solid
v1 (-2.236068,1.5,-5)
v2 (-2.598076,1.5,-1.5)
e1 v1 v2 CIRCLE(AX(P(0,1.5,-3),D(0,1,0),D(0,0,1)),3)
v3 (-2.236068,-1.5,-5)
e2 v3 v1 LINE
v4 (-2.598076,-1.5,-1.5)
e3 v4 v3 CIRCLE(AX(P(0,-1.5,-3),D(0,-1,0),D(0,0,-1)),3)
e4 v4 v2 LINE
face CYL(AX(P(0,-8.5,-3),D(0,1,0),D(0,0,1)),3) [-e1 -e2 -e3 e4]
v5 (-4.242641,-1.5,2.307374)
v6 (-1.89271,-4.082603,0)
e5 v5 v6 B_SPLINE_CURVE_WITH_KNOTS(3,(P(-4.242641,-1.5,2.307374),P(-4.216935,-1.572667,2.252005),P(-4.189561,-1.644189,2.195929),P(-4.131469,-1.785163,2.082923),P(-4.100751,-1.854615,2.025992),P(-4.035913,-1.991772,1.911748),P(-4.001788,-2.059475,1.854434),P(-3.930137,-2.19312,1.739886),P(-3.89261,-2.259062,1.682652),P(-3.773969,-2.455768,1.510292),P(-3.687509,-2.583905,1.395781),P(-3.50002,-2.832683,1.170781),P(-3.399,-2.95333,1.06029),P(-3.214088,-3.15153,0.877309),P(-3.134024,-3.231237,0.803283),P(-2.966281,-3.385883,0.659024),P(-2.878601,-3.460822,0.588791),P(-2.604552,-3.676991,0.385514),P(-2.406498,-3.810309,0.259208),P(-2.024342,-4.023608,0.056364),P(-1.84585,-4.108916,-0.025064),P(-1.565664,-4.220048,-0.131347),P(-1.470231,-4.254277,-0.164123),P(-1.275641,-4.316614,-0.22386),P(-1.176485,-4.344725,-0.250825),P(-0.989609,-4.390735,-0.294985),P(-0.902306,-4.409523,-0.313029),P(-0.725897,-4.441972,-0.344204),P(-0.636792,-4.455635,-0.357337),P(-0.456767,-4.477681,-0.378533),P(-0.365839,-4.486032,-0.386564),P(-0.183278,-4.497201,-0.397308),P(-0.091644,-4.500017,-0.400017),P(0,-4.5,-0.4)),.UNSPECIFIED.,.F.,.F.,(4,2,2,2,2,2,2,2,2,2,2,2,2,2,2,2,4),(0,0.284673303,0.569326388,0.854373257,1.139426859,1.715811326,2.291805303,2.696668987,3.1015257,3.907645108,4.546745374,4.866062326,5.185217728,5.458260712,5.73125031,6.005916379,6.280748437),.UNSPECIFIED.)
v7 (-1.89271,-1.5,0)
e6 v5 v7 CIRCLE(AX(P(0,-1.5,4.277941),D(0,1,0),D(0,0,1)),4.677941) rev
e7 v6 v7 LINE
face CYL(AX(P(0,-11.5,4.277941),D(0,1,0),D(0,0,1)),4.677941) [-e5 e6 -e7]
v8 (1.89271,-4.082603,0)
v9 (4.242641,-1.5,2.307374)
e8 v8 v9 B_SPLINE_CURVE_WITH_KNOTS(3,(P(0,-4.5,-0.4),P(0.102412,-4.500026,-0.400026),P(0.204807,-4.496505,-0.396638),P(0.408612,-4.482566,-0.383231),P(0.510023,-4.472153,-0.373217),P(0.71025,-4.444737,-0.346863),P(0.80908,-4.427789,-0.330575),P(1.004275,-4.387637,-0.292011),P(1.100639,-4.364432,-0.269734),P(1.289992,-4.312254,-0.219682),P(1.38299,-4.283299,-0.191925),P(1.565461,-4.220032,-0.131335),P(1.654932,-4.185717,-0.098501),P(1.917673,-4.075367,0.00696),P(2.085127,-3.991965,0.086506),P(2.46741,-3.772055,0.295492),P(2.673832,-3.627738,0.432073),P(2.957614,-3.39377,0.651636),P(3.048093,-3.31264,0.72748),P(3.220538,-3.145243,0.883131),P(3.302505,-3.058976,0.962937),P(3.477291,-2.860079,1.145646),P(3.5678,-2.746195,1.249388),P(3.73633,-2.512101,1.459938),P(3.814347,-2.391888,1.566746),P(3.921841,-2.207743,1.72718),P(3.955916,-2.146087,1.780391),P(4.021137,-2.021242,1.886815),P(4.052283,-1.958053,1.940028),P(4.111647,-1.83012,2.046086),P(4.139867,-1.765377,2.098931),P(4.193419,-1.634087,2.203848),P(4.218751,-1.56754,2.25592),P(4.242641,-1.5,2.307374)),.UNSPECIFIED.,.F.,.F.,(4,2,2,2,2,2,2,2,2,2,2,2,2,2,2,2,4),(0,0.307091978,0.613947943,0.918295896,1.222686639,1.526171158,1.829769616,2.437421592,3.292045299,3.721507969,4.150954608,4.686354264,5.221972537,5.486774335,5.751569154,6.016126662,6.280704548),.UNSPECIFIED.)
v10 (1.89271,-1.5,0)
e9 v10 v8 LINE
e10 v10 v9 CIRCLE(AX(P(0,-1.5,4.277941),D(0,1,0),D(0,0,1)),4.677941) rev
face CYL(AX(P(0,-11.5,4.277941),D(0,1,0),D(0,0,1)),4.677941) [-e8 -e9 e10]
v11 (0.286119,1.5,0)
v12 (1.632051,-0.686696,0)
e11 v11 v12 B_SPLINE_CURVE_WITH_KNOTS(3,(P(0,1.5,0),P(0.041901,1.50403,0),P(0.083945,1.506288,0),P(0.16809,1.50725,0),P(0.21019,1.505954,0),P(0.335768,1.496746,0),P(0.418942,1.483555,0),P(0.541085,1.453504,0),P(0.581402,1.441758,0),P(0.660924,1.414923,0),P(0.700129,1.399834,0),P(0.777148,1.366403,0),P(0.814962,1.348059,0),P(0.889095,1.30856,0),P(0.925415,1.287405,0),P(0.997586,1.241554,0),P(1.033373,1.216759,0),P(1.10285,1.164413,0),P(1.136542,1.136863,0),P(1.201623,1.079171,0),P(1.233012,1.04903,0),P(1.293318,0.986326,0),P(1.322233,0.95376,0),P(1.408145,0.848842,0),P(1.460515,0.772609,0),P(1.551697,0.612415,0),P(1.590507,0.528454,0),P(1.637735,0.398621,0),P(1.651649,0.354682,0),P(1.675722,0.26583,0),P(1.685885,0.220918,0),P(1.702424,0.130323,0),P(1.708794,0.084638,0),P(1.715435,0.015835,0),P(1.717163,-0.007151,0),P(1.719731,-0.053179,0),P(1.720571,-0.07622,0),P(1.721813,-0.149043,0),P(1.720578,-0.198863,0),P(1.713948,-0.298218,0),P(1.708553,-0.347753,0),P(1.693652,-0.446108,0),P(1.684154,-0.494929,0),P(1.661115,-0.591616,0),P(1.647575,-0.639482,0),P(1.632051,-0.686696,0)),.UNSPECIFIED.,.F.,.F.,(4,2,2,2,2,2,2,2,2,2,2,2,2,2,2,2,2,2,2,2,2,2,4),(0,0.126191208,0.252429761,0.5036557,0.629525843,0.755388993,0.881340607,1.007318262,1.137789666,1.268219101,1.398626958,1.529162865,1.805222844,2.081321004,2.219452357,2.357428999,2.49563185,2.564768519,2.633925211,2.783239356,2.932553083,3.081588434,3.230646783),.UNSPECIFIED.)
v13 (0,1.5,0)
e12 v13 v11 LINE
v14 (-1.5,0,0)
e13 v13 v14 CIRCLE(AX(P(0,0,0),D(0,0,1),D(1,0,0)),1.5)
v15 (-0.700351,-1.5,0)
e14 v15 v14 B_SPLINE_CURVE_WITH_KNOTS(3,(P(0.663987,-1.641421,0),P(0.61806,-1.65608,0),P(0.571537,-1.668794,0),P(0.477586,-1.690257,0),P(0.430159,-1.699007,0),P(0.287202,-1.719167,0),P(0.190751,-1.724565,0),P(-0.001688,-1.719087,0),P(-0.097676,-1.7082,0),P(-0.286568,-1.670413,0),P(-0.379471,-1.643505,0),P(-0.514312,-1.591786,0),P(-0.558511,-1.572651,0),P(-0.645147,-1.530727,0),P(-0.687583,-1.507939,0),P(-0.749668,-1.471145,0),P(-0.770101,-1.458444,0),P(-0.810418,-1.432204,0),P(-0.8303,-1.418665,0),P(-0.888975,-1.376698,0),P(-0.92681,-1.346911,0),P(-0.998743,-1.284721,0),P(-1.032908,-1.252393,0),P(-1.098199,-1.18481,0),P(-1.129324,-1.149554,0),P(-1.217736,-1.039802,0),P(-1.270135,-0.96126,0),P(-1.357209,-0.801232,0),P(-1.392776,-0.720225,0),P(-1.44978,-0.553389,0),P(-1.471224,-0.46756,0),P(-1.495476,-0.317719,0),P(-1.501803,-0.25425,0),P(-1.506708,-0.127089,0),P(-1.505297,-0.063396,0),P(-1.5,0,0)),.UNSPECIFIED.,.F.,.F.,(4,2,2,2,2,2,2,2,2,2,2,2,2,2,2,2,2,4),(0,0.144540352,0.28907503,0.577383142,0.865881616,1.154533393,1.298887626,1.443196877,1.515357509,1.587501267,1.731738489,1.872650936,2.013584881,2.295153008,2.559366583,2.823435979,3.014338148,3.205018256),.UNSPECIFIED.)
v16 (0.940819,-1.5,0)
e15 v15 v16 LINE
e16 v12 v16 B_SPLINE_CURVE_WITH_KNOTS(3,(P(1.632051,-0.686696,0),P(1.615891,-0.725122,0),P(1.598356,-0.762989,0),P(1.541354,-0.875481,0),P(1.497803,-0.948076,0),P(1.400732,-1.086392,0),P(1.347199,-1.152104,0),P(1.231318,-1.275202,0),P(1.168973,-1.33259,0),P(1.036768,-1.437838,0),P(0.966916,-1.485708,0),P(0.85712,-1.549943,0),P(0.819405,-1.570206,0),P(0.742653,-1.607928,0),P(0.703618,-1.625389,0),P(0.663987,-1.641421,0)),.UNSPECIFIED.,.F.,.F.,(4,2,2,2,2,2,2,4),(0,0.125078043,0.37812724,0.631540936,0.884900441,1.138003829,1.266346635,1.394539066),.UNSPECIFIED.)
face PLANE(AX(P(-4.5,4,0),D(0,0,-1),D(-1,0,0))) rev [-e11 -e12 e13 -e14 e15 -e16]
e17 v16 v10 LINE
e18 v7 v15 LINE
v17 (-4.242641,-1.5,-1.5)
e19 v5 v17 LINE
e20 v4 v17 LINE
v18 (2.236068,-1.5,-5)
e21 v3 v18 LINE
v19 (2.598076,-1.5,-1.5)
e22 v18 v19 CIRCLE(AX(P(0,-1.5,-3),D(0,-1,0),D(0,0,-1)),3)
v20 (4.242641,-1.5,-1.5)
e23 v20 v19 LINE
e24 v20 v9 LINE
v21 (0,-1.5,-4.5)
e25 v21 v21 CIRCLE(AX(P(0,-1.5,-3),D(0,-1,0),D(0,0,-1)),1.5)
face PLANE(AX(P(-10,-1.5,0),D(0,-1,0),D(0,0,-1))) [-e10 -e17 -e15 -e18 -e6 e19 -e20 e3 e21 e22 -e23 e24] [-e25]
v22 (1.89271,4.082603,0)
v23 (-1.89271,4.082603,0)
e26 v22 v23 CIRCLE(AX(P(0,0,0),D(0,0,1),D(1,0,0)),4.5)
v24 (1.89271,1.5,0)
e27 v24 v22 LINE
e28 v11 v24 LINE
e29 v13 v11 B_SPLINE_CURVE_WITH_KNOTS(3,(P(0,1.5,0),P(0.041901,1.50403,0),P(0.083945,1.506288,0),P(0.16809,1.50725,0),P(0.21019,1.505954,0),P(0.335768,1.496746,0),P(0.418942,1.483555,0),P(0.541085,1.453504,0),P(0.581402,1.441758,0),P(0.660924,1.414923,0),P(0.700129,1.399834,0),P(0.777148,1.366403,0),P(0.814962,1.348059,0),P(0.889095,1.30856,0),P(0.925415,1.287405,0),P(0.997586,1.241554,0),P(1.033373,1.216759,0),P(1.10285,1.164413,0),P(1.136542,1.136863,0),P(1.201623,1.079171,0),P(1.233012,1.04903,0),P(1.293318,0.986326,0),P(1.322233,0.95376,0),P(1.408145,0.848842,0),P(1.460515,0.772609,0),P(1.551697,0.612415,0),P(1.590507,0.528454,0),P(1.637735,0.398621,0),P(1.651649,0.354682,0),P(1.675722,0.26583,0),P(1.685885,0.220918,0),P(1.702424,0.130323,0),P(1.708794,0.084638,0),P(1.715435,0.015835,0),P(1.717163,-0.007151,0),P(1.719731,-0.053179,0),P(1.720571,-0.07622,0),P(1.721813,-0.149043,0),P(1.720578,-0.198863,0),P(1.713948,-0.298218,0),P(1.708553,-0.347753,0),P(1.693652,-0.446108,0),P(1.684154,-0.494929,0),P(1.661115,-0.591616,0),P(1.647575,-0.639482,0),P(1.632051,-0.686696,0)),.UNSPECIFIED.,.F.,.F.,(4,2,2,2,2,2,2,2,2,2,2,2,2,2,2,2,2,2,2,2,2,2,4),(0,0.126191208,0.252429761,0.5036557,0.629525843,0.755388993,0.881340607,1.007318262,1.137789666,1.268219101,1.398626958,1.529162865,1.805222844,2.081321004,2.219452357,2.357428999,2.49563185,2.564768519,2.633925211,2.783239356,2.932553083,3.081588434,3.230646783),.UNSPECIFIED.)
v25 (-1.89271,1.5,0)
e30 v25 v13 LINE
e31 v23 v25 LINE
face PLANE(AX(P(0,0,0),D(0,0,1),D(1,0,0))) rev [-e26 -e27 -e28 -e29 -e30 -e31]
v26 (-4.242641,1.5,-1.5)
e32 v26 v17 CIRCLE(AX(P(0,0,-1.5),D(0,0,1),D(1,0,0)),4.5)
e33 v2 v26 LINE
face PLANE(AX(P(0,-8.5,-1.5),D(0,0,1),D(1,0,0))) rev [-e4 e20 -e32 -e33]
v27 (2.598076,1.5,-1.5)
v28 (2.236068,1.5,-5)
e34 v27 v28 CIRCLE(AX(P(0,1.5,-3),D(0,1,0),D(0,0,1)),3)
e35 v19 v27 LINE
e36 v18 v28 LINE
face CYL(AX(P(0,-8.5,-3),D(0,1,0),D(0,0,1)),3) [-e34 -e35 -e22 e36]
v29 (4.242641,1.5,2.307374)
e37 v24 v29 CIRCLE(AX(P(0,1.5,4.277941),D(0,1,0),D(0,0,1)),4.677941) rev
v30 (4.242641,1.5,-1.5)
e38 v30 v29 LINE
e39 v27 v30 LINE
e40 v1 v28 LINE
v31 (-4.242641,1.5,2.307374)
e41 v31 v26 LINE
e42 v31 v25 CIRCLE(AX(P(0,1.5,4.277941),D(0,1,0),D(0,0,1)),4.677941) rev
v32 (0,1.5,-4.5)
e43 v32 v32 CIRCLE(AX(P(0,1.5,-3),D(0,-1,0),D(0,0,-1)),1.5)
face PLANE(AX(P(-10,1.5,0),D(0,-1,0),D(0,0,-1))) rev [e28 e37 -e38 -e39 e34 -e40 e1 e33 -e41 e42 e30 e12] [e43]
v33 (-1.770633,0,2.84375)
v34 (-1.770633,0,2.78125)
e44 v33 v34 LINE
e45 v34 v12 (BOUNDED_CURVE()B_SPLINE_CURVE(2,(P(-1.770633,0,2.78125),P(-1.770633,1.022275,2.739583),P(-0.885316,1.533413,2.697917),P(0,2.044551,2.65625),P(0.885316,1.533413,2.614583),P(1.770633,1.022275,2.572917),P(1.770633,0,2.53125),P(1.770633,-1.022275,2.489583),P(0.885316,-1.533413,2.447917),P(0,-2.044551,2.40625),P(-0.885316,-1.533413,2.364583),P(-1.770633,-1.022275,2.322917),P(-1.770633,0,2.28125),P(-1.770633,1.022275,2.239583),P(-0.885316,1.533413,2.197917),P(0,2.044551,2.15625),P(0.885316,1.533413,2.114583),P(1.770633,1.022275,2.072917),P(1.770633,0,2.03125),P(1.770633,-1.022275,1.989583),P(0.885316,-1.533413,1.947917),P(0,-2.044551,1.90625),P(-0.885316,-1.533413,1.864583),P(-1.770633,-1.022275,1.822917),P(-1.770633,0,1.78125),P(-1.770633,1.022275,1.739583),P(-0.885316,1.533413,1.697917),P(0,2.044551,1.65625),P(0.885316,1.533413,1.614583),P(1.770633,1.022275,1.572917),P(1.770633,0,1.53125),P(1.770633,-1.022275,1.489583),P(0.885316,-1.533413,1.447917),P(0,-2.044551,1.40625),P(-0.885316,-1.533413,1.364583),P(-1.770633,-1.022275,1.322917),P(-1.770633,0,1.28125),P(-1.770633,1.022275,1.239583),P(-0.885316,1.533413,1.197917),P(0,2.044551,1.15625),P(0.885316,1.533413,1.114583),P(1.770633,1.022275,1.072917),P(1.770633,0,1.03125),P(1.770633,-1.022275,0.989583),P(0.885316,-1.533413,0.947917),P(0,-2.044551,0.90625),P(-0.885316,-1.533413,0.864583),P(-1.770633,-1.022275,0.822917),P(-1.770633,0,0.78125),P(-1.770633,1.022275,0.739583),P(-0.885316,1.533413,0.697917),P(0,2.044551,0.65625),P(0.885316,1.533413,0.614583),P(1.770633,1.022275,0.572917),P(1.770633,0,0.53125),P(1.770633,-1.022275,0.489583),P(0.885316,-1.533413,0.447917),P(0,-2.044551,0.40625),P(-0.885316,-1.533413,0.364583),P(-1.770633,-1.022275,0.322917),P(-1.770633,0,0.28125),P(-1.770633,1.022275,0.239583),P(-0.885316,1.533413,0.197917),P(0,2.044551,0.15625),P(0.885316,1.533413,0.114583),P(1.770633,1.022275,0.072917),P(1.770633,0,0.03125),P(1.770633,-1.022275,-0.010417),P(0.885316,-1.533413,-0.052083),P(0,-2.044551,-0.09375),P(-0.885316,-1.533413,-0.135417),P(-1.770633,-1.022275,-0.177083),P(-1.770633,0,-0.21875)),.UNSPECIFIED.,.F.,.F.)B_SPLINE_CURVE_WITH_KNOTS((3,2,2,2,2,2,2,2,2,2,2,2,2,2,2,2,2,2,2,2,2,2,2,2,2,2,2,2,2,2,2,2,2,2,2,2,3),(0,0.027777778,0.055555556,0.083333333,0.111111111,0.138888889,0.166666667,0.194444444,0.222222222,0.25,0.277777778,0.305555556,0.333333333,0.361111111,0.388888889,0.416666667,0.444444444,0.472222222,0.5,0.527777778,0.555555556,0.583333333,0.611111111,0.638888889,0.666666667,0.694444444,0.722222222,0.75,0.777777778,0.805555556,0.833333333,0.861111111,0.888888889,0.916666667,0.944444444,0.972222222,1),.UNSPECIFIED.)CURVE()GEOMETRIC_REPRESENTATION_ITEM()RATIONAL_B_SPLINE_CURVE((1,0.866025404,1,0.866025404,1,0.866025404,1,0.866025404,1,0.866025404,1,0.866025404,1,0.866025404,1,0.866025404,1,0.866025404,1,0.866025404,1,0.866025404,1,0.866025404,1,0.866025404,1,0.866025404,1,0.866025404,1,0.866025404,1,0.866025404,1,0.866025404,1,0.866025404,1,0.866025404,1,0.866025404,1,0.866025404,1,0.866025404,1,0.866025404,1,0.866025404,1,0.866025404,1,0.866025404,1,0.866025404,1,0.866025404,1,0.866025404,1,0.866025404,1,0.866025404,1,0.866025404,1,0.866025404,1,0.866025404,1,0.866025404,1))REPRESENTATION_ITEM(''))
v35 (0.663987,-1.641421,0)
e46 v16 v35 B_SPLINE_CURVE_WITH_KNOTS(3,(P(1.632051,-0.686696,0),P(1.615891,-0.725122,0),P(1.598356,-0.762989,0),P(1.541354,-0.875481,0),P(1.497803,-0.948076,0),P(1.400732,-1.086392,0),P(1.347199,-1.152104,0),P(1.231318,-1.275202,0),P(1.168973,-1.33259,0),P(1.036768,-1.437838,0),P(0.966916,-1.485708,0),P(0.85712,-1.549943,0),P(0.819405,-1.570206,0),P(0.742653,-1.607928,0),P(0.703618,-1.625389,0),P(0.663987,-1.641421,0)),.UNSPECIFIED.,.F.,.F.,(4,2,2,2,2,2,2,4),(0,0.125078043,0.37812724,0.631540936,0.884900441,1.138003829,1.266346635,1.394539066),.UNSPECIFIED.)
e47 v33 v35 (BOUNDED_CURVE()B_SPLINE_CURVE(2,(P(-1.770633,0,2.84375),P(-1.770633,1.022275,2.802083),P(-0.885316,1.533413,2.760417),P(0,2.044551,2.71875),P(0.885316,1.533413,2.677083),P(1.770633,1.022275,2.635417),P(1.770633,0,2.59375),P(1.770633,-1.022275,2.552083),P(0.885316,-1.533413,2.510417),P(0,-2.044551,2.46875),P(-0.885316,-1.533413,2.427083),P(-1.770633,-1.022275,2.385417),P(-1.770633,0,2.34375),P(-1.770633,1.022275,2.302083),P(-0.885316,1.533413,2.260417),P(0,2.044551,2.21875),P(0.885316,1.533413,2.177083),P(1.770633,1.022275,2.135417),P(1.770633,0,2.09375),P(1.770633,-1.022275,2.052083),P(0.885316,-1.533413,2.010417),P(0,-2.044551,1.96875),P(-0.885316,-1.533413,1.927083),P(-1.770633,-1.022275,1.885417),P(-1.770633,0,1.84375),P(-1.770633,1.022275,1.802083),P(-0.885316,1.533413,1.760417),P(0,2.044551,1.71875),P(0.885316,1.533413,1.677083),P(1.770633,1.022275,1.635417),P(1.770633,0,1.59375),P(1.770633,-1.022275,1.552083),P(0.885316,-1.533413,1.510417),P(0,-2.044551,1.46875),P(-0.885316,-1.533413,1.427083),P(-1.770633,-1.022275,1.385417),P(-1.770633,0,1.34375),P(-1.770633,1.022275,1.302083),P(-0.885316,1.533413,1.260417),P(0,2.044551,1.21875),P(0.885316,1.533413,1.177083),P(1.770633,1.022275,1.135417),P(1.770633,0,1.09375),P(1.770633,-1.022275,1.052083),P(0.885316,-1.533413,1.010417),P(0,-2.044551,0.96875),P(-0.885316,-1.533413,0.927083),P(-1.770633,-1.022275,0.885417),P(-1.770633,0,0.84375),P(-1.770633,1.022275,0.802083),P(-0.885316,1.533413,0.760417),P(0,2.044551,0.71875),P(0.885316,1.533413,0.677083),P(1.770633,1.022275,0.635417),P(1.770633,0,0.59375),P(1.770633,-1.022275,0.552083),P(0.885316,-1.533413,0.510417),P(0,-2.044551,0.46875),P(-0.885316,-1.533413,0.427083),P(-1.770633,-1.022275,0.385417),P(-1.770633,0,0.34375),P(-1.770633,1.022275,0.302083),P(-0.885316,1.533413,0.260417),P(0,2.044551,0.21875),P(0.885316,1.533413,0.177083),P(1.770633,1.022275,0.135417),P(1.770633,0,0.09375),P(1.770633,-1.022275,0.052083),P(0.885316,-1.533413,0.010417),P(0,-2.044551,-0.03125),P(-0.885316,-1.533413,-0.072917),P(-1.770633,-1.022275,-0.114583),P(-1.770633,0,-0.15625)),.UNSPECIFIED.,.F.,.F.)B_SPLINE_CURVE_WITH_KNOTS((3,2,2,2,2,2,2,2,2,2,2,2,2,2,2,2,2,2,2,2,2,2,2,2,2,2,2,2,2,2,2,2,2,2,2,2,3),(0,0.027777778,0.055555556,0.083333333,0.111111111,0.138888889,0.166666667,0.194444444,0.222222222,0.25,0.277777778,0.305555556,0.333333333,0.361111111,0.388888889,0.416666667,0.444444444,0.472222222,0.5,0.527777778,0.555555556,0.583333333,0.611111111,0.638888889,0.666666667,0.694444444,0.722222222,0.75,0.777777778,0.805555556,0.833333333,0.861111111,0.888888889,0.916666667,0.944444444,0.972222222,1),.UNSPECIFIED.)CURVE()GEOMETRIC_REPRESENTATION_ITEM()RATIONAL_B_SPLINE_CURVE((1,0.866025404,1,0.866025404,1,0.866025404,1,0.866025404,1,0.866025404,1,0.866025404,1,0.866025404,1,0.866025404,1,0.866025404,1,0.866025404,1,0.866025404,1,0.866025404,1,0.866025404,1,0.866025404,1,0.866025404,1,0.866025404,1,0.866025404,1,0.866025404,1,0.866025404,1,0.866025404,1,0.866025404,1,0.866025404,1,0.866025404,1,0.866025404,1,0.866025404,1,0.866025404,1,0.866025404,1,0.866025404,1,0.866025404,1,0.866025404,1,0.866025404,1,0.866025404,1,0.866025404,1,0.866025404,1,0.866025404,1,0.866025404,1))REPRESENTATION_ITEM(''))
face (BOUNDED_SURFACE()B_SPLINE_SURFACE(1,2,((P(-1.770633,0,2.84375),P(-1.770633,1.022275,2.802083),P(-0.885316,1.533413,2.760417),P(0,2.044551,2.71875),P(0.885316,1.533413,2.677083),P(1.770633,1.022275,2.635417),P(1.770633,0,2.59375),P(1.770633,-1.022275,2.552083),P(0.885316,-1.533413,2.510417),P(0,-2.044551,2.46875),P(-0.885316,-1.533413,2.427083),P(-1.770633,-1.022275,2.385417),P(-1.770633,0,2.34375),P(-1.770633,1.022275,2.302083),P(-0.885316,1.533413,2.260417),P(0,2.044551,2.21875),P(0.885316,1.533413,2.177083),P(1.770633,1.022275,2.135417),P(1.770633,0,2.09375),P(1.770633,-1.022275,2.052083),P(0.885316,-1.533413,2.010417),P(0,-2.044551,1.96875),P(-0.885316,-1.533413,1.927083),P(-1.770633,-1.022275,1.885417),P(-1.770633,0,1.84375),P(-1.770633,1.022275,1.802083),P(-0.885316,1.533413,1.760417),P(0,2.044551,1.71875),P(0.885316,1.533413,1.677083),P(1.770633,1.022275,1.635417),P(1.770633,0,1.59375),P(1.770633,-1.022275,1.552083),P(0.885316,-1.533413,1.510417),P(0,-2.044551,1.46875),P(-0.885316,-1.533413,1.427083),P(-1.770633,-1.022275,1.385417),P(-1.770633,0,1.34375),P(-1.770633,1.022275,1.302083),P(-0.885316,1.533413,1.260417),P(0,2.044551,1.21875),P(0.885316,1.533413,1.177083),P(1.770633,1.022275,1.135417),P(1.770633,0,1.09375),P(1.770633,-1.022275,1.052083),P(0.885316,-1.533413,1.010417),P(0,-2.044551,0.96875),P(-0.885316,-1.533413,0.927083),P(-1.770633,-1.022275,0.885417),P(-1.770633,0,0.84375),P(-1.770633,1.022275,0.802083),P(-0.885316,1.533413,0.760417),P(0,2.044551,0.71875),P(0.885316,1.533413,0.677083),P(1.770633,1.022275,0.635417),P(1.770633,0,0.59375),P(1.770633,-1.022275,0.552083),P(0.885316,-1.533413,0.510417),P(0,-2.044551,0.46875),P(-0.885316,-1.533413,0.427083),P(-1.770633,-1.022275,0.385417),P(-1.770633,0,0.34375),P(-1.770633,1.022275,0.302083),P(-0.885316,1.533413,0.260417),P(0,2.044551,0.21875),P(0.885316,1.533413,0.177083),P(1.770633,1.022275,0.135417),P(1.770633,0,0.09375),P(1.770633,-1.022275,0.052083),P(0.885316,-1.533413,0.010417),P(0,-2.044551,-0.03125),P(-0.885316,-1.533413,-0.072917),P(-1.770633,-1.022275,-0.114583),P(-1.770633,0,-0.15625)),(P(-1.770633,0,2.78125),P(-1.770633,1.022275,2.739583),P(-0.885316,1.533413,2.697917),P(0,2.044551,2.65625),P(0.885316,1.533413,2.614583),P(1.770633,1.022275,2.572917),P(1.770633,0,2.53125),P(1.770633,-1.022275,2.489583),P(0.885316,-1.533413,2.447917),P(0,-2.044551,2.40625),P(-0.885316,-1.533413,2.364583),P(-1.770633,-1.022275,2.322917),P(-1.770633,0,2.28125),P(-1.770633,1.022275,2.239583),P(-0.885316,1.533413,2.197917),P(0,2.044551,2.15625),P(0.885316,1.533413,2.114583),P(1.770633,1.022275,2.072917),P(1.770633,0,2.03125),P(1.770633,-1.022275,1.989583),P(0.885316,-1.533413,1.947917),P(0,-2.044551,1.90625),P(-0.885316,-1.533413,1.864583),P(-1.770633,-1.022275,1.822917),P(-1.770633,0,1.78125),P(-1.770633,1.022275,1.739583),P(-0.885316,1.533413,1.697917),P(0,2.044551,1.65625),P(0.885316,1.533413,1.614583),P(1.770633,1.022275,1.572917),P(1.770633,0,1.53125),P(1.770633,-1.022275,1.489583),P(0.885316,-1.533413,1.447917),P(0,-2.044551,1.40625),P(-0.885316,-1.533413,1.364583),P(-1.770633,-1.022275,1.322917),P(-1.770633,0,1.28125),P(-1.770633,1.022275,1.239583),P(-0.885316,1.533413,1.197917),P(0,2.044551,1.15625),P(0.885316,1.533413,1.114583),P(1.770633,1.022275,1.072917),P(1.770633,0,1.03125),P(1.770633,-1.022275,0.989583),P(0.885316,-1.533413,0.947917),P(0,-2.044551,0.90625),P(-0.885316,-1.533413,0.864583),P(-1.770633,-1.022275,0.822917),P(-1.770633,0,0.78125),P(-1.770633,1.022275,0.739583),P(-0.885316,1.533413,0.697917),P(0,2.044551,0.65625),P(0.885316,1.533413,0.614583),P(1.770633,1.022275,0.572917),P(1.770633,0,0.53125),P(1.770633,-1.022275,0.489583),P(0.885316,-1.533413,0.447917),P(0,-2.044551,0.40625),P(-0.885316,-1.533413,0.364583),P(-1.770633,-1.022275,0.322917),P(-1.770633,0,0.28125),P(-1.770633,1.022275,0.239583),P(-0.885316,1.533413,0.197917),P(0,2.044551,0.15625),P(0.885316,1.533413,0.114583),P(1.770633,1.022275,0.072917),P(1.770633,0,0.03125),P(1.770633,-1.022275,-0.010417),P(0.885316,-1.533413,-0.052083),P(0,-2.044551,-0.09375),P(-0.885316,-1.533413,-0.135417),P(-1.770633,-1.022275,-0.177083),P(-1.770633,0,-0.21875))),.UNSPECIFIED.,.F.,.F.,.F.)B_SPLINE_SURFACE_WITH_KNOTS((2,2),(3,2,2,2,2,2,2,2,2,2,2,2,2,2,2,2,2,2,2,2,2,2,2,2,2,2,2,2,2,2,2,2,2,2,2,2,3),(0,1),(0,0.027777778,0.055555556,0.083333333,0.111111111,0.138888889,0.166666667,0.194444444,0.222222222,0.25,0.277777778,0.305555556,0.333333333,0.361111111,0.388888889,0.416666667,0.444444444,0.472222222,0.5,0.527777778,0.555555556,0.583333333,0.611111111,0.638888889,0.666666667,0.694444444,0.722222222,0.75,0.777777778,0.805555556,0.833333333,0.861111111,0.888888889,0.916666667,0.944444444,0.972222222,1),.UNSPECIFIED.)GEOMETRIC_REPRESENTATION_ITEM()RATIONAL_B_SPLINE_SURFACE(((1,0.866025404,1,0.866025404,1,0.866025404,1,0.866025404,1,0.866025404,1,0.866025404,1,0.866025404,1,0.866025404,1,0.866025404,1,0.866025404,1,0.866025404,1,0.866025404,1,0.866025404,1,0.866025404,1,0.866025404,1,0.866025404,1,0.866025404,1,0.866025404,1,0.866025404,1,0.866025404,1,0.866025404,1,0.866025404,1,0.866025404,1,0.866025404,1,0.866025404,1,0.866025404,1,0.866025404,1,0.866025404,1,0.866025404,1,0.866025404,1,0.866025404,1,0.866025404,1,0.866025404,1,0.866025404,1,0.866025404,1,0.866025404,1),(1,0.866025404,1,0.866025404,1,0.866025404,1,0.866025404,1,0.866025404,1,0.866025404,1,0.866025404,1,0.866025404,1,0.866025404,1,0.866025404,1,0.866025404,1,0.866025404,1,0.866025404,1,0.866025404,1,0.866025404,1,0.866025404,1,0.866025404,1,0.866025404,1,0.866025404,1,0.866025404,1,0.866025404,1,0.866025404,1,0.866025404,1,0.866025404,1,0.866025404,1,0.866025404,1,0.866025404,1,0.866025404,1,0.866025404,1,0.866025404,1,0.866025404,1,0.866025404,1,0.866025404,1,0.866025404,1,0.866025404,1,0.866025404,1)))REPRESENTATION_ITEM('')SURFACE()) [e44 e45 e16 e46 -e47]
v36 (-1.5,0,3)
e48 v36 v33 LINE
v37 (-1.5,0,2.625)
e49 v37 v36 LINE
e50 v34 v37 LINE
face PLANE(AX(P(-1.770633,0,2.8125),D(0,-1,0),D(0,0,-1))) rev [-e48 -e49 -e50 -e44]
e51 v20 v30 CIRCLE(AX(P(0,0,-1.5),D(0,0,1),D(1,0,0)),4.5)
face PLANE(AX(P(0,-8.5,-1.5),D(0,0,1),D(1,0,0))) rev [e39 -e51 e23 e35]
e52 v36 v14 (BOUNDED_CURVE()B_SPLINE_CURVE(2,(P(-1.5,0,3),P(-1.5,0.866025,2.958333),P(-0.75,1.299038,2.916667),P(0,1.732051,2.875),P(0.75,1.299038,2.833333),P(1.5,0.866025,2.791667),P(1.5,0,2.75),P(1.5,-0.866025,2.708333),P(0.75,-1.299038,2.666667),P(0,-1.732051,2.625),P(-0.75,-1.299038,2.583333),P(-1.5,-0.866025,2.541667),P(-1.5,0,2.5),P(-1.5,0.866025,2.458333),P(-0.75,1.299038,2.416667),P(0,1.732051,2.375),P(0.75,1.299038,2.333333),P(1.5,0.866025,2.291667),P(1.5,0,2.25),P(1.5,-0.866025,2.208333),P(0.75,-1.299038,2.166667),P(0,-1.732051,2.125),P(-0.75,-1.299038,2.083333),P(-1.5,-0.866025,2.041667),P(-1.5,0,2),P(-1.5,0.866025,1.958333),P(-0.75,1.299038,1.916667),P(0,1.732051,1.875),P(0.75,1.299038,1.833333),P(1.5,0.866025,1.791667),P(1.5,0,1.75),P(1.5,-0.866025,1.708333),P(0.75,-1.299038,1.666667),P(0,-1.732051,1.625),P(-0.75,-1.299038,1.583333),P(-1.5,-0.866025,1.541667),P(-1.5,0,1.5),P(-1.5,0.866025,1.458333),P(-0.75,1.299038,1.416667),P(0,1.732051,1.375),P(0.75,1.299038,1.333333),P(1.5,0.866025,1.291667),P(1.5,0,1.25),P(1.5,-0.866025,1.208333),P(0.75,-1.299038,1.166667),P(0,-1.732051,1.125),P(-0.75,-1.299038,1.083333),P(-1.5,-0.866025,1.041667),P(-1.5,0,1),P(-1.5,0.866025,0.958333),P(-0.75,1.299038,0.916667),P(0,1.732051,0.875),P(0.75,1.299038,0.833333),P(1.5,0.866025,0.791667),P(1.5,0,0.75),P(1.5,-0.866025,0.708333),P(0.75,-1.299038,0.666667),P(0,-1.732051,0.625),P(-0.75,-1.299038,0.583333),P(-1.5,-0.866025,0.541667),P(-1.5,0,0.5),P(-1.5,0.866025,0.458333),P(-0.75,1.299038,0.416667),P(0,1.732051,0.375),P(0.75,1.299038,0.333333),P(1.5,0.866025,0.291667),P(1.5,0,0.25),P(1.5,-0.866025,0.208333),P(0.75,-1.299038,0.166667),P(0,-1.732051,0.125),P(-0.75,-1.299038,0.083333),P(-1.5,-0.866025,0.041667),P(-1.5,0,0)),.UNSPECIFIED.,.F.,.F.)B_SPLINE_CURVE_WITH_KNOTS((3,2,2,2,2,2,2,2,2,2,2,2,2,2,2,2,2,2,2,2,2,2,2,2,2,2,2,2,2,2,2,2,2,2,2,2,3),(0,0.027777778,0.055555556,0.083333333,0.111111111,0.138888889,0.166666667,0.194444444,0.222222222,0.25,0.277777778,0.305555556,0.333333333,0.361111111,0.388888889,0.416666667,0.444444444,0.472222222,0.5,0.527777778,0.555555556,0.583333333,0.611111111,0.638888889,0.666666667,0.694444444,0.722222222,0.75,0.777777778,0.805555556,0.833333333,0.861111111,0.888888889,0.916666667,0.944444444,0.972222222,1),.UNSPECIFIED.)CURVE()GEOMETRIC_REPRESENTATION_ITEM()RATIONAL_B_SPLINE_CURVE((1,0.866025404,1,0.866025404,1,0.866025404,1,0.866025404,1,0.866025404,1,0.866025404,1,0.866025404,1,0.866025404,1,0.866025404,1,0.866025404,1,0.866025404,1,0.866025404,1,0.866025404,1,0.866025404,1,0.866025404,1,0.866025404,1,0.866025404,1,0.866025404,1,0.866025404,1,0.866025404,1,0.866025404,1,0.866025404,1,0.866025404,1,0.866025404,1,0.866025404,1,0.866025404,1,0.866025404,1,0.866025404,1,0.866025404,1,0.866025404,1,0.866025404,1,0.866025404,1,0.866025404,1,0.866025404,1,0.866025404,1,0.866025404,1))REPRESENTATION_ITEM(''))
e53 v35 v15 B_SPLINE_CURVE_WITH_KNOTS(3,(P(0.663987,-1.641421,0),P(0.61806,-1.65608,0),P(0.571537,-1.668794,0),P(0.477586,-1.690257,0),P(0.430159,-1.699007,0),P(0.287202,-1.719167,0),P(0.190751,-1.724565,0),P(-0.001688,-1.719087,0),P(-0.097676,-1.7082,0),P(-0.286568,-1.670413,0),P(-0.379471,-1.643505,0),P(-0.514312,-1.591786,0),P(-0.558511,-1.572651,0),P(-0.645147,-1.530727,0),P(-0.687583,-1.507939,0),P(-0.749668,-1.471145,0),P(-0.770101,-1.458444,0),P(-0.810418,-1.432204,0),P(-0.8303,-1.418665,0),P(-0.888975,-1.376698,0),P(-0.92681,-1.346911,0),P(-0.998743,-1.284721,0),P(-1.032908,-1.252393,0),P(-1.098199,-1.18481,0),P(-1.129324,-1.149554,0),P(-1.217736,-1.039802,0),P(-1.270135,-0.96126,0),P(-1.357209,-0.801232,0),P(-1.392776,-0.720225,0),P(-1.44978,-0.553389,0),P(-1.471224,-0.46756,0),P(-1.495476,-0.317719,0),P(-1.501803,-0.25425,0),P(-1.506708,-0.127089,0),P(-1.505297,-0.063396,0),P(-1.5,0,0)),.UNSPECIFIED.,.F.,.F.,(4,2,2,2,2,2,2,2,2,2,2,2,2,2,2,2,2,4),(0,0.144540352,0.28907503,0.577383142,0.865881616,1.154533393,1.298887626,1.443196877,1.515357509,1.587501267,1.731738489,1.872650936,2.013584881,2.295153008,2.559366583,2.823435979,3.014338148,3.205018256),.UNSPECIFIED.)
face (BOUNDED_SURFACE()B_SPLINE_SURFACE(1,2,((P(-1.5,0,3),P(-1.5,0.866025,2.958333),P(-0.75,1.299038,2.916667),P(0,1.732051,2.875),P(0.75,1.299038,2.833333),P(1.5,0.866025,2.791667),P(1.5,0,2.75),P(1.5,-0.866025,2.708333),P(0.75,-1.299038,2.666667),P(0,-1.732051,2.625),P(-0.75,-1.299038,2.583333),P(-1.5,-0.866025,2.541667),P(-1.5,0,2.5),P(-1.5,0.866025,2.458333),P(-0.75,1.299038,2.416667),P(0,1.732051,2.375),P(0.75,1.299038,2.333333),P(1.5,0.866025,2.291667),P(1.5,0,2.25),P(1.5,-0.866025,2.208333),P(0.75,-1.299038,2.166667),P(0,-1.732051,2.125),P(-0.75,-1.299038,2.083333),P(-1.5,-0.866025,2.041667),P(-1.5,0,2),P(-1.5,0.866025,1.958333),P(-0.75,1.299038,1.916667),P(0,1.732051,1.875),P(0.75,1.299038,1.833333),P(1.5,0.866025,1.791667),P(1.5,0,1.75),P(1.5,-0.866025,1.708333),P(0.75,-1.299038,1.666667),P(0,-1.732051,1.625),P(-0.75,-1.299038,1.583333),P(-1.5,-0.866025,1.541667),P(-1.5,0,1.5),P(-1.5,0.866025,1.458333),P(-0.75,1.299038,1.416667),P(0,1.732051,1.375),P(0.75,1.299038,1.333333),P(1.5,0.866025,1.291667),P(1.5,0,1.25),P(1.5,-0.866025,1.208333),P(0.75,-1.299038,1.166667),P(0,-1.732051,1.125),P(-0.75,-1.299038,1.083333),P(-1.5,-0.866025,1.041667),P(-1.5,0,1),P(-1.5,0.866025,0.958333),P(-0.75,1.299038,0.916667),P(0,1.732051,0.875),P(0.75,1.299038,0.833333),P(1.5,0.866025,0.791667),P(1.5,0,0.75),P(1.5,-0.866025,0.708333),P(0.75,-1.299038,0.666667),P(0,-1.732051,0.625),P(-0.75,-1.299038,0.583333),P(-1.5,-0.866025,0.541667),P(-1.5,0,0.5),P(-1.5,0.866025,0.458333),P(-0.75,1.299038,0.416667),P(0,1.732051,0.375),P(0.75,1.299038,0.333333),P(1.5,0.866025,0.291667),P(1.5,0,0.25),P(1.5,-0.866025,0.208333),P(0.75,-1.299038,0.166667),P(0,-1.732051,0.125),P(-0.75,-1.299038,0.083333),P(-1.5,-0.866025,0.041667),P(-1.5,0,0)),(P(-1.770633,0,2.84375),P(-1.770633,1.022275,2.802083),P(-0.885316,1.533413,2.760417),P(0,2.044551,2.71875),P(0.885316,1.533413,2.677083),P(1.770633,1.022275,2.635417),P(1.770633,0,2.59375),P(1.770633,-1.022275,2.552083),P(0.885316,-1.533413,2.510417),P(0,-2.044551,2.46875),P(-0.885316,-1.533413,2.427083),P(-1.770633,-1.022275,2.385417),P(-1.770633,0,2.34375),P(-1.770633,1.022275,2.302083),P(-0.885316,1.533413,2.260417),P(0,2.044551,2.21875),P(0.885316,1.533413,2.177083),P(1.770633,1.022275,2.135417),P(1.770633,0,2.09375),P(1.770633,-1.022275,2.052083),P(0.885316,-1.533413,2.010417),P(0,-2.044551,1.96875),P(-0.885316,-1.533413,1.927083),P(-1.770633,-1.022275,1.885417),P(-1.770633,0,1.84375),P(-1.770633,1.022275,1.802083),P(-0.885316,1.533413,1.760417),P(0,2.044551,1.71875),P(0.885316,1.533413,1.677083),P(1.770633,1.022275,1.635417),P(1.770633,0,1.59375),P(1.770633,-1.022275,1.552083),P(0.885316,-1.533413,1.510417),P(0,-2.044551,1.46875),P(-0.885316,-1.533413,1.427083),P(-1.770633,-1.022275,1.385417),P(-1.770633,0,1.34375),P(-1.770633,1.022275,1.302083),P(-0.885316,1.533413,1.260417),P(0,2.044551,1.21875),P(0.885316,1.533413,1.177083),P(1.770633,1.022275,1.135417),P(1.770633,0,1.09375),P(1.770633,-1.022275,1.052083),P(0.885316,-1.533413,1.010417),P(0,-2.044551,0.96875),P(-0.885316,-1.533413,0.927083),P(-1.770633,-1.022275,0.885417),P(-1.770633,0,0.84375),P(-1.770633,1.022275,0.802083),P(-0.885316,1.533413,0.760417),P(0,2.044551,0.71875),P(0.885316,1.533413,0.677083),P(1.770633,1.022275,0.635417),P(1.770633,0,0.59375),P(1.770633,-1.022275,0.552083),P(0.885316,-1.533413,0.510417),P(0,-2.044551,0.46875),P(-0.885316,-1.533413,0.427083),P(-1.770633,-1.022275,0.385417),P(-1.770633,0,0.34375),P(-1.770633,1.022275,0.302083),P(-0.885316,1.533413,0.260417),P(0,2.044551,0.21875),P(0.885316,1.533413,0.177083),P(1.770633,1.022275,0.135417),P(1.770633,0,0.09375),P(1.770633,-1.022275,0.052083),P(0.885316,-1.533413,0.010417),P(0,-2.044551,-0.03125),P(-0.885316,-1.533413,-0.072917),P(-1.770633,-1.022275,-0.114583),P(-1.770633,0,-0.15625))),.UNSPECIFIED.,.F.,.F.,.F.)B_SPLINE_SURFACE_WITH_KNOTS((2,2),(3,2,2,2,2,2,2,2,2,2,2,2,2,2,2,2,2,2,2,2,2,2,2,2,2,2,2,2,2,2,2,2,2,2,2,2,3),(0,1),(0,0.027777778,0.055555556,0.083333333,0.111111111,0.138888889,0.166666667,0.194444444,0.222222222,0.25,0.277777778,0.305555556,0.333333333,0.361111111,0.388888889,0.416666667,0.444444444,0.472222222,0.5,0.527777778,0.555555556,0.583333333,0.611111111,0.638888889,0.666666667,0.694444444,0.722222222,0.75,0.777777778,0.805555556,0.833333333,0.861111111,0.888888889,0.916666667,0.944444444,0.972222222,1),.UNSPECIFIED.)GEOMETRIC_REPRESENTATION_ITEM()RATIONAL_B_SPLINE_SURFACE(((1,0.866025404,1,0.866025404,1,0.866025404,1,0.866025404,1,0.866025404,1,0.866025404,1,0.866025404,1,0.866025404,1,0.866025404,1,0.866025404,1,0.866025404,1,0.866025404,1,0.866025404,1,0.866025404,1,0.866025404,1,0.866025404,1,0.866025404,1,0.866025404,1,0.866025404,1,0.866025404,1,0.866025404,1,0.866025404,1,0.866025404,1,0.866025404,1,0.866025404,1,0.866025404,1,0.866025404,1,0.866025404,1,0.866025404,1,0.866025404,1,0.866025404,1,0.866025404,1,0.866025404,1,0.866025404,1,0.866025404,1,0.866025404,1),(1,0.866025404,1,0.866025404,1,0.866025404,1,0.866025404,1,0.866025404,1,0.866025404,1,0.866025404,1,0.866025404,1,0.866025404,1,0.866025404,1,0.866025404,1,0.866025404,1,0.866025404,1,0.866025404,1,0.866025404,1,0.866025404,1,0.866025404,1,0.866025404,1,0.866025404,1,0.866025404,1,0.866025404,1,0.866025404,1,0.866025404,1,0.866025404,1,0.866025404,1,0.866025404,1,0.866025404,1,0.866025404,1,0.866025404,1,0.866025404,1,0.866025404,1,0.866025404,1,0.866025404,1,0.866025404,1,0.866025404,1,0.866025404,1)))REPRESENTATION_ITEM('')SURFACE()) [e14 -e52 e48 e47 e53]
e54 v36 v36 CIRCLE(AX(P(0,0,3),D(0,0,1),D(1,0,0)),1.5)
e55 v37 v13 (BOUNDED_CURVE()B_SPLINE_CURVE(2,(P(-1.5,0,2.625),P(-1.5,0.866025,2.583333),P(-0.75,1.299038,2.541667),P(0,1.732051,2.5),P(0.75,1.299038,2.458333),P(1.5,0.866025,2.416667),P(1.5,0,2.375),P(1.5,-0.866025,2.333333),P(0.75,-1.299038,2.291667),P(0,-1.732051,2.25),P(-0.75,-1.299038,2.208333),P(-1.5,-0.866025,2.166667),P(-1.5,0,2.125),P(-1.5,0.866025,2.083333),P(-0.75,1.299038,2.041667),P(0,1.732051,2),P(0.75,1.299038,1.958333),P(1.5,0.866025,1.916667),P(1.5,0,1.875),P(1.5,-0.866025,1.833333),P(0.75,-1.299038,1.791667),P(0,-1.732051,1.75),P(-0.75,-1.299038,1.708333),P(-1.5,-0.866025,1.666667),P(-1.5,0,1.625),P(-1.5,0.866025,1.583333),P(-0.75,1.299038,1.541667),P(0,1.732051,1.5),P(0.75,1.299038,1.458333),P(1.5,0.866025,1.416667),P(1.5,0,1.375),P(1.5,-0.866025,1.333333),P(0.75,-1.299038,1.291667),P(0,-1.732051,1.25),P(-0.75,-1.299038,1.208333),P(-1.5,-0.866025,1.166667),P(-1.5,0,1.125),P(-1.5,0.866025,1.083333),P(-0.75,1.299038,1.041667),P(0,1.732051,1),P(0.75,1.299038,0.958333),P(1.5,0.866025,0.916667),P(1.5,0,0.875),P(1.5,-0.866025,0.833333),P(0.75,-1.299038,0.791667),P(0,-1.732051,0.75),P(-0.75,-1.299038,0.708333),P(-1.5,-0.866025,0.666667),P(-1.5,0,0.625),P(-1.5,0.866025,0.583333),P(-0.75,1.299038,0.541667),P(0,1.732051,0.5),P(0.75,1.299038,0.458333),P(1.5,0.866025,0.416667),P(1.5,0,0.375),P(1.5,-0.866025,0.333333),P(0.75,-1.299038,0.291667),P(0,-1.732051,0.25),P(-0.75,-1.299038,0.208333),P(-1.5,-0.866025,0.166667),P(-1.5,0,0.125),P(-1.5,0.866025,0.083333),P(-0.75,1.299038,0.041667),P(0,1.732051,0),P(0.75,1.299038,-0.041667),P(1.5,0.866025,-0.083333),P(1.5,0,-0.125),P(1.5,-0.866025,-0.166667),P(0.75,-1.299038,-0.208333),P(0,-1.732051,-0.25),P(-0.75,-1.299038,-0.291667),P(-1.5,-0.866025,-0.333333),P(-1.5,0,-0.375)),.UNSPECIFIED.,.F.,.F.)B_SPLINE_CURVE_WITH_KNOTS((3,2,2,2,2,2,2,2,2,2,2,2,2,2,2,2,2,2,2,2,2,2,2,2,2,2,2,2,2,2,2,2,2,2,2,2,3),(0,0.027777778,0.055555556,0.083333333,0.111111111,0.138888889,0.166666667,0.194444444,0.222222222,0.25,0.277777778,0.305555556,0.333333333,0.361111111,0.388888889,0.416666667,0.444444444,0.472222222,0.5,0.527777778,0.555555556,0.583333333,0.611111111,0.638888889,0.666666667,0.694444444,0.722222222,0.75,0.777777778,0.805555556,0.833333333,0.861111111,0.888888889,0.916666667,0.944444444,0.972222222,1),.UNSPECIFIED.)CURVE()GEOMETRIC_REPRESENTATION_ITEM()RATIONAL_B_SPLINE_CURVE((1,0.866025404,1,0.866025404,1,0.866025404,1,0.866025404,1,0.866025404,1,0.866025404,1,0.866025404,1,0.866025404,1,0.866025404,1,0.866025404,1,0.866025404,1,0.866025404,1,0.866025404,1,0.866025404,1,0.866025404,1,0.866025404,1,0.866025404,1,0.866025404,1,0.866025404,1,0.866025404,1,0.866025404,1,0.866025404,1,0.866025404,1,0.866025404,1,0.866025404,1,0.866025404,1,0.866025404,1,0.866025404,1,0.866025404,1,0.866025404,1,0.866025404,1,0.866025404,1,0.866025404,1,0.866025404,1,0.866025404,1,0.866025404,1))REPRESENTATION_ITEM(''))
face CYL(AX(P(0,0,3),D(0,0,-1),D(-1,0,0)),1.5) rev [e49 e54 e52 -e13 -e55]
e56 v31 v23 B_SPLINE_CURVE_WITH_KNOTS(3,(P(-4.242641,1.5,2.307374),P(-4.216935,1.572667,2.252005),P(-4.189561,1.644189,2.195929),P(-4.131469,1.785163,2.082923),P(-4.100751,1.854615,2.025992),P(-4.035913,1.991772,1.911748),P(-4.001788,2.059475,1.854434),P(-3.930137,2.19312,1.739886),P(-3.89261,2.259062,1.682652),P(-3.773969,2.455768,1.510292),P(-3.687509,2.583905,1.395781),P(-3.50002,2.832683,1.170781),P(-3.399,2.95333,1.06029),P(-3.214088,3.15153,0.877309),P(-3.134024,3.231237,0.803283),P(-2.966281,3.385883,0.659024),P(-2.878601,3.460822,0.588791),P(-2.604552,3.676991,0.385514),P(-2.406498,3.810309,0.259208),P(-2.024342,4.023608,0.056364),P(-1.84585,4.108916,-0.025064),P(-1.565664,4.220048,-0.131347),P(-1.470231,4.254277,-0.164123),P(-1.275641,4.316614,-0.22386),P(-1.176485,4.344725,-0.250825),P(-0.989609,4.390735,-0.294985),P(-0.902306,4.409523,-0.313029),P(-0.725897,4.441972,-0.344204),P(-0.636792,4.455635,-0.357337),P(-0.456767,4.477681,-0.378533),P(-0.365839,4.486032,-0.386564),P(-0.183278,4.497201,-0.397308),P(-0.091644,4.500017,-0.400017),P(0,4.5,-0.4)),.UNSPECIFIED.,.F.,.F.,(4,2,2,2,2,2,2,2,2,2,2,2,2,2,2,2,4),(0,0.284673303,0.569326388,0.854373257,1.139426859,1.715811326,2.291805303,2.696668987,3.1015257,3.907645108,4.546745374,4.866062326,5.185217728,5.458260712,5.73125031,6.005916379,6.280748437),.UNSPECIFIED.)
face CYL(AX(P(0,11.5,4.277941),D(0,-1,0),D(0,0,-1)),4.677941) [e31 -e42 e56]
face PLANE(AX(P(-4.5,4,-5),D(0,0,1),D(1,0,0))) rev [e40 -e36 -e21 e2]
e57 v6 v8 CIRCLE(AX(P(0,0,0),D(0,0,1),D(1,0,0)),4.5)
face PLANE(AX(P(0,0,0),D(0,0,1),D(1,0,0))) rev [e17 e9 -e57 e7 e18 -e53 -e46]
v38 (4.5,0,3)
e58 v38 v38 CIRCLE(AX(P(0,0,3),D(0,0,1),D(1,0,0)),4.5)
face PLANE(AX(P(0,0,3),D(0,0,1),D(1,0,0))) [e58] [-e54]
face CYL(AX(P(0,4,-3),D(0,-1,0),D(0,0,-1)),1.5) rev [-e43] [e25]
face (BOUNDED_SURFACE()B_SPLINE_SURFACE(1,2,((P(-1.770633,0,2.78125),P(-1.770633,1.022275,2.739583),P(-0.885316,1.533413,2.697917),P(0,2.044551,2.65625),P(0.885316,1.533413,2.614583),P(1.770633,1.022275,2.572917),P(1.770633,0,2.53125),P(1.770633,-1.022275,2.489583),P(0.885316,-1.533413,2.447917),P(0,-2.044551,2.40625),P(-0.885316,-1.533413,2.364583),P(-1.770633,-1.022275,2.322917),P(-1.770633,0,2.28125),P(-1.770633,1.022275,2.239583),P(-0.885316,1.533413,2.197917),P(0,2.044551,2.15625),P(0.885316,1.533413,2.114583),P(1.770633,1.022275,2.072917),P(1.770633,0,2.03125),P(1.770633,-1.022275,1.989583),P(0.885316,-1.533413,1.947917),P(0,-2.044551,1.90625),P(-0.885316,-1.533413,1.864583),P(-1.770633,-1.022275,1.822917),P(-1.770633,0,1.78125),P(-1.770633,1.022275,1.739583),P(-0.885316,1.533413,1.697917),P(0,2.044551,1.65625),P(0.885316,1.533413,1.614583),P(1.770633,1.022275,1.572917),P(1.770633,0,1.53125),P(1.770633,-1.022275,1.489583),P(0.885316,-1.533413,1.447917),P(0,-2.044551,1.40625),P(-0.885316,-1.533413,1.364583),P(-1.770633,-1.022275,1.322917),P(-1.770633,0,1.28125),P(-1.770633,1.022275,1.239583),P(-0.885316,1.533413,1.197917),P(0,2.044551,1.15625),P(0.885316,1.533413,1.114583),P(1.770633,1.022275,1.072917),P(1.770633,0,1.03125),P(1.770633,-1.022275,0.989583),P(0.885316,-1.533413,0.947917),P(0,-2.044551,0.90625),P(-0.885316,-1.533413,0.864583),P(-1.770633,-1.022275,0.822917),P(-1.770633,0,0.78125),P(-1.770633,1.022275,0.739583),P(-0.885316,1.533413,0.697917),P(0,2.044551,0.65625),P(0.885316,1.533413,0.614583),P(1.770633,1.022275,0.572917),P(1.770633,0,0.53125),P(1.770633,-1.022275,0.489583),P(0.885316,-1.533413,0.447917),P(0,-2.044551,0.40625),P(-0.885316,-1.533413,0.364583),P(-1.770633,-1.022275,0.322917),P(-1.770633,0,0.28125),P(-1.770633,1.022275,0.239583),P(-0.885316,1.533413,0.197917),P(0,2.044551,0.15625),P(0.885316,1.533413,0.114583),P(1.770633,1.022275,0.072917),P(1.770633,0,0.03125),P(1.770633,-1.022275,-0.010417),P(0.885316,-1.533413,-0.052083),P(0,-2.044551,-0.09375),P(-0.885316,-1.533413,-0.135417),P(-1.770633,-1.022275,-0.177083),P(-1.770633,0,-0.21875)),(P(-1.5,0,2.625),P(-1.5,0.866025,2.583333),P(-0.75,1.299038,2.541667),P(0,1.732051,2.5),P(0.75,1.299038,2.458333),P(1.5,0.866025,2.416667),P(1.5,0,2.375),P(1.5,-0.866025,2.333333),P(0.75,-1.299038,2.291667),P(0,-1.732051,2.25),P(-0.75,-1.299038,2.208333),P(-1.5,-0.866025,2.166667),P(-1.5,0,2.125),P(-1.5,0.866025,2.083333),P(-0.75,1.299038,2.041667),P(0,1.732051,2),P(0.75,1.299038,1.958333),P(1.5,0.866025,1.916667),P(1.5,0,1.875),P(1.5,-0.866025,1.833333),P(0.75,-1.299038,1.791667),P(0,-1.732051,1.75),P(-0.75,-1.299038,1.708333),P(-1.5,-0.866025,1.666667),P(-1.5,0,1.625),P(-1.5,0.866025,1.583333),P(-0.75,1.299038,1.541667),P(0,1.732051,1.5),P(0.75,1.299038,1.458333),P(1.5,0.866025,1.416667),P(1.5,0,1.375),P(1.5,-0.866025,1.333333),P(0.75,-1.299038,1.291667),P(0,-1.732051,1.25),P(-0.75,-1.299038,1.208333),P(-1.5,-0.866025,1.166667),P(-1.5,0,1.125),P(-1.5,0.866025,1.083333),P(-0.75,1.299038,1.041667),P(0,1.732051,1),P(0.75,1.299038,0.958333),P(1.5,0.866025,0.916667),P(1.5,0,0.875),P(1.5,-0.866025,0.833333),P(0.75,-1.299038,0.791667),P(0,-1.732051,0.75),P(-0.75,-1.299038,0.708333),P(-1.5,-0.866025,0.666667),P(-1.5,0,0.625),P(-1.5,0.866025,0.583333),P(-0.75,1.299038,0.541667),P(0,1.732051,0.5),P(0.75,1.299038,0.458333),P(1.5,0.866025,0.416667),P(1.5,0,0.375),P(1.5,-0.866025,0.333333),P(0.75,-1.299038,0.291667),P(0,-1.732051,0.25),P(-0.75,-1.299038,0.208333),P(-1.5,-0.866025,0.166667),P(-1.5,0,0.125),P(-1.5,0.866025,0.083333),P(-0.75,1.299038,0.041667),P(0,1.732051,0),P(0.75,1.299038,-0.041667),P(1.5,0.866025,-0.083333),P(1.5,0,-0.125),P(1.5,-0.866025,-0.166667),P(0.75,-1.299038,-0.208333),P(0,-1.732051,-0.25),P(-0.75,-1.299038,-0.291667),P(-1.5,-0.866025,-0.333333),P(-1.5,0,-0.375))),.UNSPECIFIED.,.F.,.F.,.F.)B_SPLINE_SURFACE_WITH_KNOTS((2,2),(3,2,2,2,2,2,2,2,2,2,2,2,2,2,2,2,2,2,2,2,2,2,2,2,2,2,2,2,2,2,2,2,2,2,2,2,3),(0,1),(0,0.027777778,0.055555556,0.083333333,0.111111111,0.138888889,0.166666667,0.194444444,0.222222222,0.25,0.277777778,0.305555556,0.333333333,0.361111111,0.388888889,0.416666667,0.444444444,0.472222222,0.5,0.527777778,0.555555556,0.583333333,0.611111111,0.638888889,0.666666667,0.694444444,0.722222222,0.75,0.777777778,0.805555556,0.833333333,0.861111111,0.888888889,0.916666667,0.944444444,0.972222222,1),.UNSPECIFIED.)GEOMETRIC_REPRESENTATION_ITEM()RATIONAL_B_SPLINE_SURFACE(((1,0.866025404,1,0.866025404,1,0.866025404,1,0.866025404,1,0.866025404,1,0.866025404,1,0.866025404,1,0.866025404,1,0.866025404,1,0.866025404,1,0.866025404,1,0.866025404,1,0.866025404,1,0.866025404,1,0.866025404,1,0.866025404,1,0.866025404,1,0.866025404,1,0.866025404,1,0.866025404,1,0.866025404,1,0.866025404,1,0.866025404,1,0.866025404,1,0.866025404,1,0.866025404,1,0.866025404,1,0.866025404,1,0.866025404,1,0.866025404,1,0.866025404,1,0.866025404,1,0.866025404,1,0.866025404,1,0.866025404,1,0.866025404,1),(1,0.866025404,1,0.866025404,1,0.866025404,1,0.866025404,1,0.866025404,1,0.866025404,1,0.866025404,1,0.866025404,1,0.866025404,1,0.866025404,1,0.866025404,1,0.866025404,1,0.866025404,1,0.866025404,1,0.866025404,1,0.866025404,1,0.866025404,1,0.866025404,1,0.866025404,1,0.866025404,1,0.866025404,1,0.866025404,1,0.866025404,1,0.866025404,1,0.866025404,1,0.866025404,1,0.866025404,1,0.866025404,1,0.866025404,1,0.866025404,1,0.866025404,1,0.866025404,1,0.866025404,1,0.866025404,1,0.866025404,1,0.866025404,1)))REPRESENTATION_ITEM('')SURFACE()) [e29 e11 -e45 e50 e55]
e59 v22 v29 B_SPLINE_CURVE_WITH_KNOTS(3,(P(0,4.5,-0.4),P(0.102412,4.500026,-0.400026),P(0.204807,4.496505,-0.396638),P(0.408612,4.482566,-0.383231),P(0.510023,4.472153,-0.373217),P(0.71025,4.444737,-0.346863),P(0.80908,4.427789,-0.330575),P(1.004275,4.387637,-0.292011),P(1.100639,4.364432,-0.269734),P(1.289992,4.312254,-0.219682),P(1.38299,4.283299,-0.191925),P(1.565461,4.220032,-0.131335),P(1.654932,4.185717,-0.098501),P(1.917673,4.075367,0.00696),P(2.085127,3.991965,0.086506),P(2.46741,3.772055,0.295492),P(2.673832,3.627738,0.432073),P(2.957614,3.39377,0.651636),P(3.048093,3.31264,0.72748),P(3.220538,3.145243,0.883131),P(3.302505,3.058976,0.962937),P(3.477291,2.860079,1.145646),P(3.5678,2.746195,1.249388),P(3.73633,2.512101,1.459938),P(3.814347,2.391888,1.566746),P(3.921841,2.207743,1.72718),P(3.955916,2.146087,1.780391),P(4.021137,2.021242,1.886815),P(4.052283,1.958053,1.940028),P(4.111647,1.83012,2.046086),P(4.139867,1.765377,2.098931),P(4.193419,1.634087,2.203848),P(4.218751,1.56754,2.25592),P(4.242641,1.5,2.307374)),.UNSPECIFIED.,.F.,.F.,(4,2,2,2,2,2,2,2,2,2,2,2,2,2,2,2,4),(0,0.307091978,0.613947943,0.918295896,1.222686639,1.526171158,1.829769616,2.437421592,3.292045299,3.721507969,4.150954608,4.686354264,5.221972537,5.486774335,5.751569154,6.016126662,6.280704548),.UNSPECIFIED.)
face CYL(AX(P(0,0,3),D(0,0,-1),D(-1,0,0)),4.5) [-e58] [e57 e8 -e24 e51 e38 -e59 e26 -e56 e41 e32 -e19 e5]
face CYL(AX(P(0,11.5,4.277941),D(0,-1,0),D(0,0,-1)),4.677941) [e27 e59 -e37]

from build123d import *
from build123d.topology import SkipClean

# Parameters (mm, degrees)
CROQUIS1_R              = 4.5
CROQUIS1_R_2            = 1.5
SALIENTE_EXTRUIR2_DEPTH = 3
ROSCA1_PITCH            = 0.5
CROQUIS5_W              = 9
CROQUIS5_H              = 5
CROQUIS5_R              = 1.5
SALIENTE_EXTRUIR3_DEPTH = 4
CORTAR_EXTRUIR3_START   = -10
CORTAR_EXTRUIR3_DEPTH   = 10
CROQUIS7_W              = 5
CROQUIS7_H              = 3
CORTAR_EXTRUIR4_DEPTH   = 10
CORTAR_EXTRUIR6_DEPTH   = 10
CROQUIS10_W             = 0.257359313
CROQUIS10_H             = 3.5
CORTAR_EXTRUIR7_DEPTH   = 10


with BuildPart() as part:
    # Croquis1 → Saliente-Extruir2 (new body)
    with BuildSketch(Plane.XY):
        Circle(CROQUIS1_R)
        Circle(CROQUIS1_R_2, mode=Mode.SUBTRACT)
    extrude(amount=SALIENTE_EXTRUIR2_DEPTH)

    # Rosca1: the profile of Perfil de rosca1 profile screwed along a right-hand helix of 6 turns, 6 arcs to a turn; built about Z, then put on its axis
    rosca1_z = Axis((0, 0, 0), (0, 0, 1))
    rosca1_corners = [(1.4997, 0, -0.000173205), (1.770632938, 0, 0.156249999), (1.770632938, 0, 0.218749999), (1.4997, 0, 0.375173204)]
    with BuildLine(mode=Mode.PRIVATE) as rosca1_profile:
        Line(rosca1_corners[0], rosca1_corners[1])
        Line(rosca1_corners[1], rosca1_corners[2])
        Line(rosca1_corners[2], rosca1_corners[3])
        Line(rosca1_corners[3], rosca1_corners[0])
    rosca1_cap = Face(rosca1_profile.wire())
    rosca1_turn_angles = [0, 30, 60, 90, 120, 150, 180, 210, 240, 270, 300, 330, 360]
    rosca1_turn_weights = [1, 0.8660254037844387, 1, 0.8660254037844387, 1, 0.8660254037844387, 1, 0.8660254037844387, 1, 0.8660254037844387, 1, 0.8660254037844387, 1]
    rosca1_turn_rails = [Edge.make_bspline([Vector(p[0], p[1], 0).rotate(rosca1_z, rosca1_turn_angles[k]) / rosca1_turn_weights[k] + Vector(0, 0, p[2] + ROSCA1_PITCH * rosca1_turn_angles[k] / 360) for k in range(13)], [0, 0, 0, 1, 1, 2, 2, 3, 3, 4, 4, 5, 5, 6, 6, 6], 2, rosca1_turn_weights) for p in rosca1_corners]
    rosca1_turn_sides = [Face.make_surface_from_curves(rosca1_turn_rails[p[0]], rosca1_turn_rails[p[1]]) for p in [(0, 1), (1, 2), (2, 3), (3, 0)]]
    rosca1 = Plane(origin=(0, 0, 3), x_dir=(-1, 0, 0), z_dir=(0, 0, -1)) * Solid(Shell([*[p.moved(Location((0, 0, ROSCA1_PITCH * i))) for i in range(6) for p in rosca1_turn_sides], rosca1_cap, rosca1_cap.rotate(rosca1_z, 2160).moved(Location((0, 0, ROSCA1_PITCH * 2160 / 360)))]))
    add(rosca1, mode=Mode.SUBTRACT)

    # Croquis5 → Saliente-Extruir3 (add, symmetric)
    with BuildSketch(Plane(origin=(0, 0, 0), x_dir=(1, 0, 0), z_dir=(0, 1, 0))):
        with Locations((0, 2.5)):
            Rectangle(CROQUIS5_W, CROQUIS5_H)
        with Locations(Location((0, 3, 0), (0, 0, 270))):
            Circle(CROQUIS5_R, mode=Mode.SUBTRACT)
    extrude(amount=SALIENTE_EXTRUIR3_DEPTH, both=True)

    # Croquis6 → Cortar-Extruir3 (cut)
    with SkipClean():  # the faces are left unmerged after this step: merging them gives an invalid solid
        with BuildSketch(Plane.XY.offset(CORTAR_EXTRUIR3_START)):
            with BuildLine():
                Line((-4.5, 4), (-4.5, 0))
                ThreePointArc((-4.5, 0), (-3.842329219, 2.342329219), (-2.061552813, 4))
                Line((-2.061552813, 4), (-4.5, 4))
            make_face()
            with BuildLine():
                Line((4.5, 4), (2.061552813, 4))
                ThreePointArc((2.061552813, 4), (3.842329219, 2.342329219), (4.5, 0))
                Line((4.5, 0), (4.5, 4))
            make_face()
            with BuildLine():
                Line((4.5, -4), (4.5, 0))
                ThreePointArc((4.5, 0), (3.842329219, -2.342329219), (2.061552813, -4))
                Line((2.061552813, -4), (4.5, -4))
            make_face()
            with BuildLine():
                Line((-4.5, 0), (-4.5, -4))
                Line((-4.5, -4), (-2.061552813, -4))
                ThreePointArc((-2.061552813, -4), (-3.842329219, -2.342329219), (-4.5, 0))
            make_face()
        extrude(amount=CORTAR_EXTRUIR3_DEPTH, mode=Mode.SUBTRACT)

    # Croquis7 → Cortar-Extruir4 (cut, symmetric)
    with SkipClean():  # the faces are left unmerged after this step: merging them gives an invalid solid
        with BuildSketch(Plane(origin=(0, 0, 0), x_dir=(0, 0, -1), z_dir=(1, 0, 0))):
            with Locations((2.5, 3)):
                Rectangle(CROQUIS7_W, CROQUIS7_H)
            with Locations((2.5, -3)):
                Rectangle(CROQUIS7_W, CROQUIS7_H)
        extrude(amount=CORTAR_EXTRUIR4_DEPTH, both=True, mode=Mode.SUBTRACT)

    # Croquis9 → Cortar-Extruir6 (cut)
    with SkipClean():  # the faces are left unmerged after this step: merging them gives an invalid solid
        with BuildSketch(Plane(origin=(0, 1.5, 0), x_dir=(1, 0, 0), z_dir=(0, 1, 0))):
            with BuildLine():
                Line((-4.242640687, 0), (-1.892710475, 0))
                ThreePointArc((-1.892710475, 0), (-0.967258097, 0.298907677), (1e-08, 0.4))
                Line((1e-08, 0.4), (-4.242640687, 0.4))
                Line((-4.242640687, 0.4), (-4.242640687, 0))
            make_face()
            with BuildLine():
                Line((-4.5, 0.4), (-4.5, -3))
                ThreePointArc((-4.5, -3), (-3.530819565, -1.20931822), (-1.892710475, 0))
                Line((-1.892710475, 0), (-4.242640687, 0))
                Line((-4.242640687, 0), (-4.242640687, 0.4))
                Line((-4.242640687, 0.4), (-4.5, 0.4))
            make_face()
            with BuildLine():
                ThreePointArc((1e-08, 0.4), (0.967258107, 0.298907675), (1.892710475, 0))
                Line((1.892710475, 0), (4.242640687, 0))
                Line((4.242640687, 0), (4.242640687, 0.4))
                Line((4.242640687, 0.4), (1e-08, 0.4))
            make_face()
            with BuildLine():
                ThreePointArc((1.892710475, 0), (3.530819565, -1.20931822), (4.5, -3))
                Line((4.5, -3), (4.5, 0.4))
                Line((4.5, 0.4), (4.242640687, 0.4))
                Line((4.242640687, 0.4), (4.242640687, 0))
                Line((4.242640687, 0), (1.892710475, 0))
            make_face()
        cortar_extruir6 = extrude(amount=CORTAR_EXTRUIR6_DEPTH, mode=Mode.SUBTRACT)

    # Simetría1: Cortar-Extruir6 across plane
    with SkipClean():  # the faces are left unmerged after this step: merging them gives an invalid solid
        add(cortar_extruir6.mirror(Plane.ZX), mode=Mode.SUBTRACT)

    # Croquis10 → Cortar-Extruir7 (cut)
    with SkipClean():  # the faces are left unmerged after this step: merging them gives an invalid solid
        with BuildSketch(Plane(origin=(0, 1.5, 0), x_dir=(1, 0, 0), z_dir=(0, 1, 0))):
            with BuildLine():
                Line((-4.242640687, 5), (-4.242640687, 1.5))
                Line((-4.242640687, 1.5), (-2.598076211, 1.5))
                ThreePointArc((-2.598076211, 1.5), (-2.984080681, 3.308646222), (-2.236067977, 5))
                Line((-2.236067977, 5), (-4.242640687, 5))
            make_face()
            with BuildLine():
                ThreePointArc((2.236067977, 5), (2.984080681, 3.308646222), (2.598076211, 1.5))
                Line((2.598076211, 1.5), (4.242640687, 1.5))
                Line((4.242640687, 1.5), (4.242640687, 5))
                Line((4.242640687, 5), (2.236067977, 5))
            make_face()
            with Locations((-4.371320344, 3.25)):
                Rectangle(CROQUIS10_W, CROQUIS10_H)
            with Locations((4.371320344, 3.25)):
                Rectangle(CROQUIS10_W, CROQUIS10_H)
        extrude(amount=-CORTAR_EXTRUIR7_DEPTH, mode=Mode.SUBTRACT)


solid = part.part
